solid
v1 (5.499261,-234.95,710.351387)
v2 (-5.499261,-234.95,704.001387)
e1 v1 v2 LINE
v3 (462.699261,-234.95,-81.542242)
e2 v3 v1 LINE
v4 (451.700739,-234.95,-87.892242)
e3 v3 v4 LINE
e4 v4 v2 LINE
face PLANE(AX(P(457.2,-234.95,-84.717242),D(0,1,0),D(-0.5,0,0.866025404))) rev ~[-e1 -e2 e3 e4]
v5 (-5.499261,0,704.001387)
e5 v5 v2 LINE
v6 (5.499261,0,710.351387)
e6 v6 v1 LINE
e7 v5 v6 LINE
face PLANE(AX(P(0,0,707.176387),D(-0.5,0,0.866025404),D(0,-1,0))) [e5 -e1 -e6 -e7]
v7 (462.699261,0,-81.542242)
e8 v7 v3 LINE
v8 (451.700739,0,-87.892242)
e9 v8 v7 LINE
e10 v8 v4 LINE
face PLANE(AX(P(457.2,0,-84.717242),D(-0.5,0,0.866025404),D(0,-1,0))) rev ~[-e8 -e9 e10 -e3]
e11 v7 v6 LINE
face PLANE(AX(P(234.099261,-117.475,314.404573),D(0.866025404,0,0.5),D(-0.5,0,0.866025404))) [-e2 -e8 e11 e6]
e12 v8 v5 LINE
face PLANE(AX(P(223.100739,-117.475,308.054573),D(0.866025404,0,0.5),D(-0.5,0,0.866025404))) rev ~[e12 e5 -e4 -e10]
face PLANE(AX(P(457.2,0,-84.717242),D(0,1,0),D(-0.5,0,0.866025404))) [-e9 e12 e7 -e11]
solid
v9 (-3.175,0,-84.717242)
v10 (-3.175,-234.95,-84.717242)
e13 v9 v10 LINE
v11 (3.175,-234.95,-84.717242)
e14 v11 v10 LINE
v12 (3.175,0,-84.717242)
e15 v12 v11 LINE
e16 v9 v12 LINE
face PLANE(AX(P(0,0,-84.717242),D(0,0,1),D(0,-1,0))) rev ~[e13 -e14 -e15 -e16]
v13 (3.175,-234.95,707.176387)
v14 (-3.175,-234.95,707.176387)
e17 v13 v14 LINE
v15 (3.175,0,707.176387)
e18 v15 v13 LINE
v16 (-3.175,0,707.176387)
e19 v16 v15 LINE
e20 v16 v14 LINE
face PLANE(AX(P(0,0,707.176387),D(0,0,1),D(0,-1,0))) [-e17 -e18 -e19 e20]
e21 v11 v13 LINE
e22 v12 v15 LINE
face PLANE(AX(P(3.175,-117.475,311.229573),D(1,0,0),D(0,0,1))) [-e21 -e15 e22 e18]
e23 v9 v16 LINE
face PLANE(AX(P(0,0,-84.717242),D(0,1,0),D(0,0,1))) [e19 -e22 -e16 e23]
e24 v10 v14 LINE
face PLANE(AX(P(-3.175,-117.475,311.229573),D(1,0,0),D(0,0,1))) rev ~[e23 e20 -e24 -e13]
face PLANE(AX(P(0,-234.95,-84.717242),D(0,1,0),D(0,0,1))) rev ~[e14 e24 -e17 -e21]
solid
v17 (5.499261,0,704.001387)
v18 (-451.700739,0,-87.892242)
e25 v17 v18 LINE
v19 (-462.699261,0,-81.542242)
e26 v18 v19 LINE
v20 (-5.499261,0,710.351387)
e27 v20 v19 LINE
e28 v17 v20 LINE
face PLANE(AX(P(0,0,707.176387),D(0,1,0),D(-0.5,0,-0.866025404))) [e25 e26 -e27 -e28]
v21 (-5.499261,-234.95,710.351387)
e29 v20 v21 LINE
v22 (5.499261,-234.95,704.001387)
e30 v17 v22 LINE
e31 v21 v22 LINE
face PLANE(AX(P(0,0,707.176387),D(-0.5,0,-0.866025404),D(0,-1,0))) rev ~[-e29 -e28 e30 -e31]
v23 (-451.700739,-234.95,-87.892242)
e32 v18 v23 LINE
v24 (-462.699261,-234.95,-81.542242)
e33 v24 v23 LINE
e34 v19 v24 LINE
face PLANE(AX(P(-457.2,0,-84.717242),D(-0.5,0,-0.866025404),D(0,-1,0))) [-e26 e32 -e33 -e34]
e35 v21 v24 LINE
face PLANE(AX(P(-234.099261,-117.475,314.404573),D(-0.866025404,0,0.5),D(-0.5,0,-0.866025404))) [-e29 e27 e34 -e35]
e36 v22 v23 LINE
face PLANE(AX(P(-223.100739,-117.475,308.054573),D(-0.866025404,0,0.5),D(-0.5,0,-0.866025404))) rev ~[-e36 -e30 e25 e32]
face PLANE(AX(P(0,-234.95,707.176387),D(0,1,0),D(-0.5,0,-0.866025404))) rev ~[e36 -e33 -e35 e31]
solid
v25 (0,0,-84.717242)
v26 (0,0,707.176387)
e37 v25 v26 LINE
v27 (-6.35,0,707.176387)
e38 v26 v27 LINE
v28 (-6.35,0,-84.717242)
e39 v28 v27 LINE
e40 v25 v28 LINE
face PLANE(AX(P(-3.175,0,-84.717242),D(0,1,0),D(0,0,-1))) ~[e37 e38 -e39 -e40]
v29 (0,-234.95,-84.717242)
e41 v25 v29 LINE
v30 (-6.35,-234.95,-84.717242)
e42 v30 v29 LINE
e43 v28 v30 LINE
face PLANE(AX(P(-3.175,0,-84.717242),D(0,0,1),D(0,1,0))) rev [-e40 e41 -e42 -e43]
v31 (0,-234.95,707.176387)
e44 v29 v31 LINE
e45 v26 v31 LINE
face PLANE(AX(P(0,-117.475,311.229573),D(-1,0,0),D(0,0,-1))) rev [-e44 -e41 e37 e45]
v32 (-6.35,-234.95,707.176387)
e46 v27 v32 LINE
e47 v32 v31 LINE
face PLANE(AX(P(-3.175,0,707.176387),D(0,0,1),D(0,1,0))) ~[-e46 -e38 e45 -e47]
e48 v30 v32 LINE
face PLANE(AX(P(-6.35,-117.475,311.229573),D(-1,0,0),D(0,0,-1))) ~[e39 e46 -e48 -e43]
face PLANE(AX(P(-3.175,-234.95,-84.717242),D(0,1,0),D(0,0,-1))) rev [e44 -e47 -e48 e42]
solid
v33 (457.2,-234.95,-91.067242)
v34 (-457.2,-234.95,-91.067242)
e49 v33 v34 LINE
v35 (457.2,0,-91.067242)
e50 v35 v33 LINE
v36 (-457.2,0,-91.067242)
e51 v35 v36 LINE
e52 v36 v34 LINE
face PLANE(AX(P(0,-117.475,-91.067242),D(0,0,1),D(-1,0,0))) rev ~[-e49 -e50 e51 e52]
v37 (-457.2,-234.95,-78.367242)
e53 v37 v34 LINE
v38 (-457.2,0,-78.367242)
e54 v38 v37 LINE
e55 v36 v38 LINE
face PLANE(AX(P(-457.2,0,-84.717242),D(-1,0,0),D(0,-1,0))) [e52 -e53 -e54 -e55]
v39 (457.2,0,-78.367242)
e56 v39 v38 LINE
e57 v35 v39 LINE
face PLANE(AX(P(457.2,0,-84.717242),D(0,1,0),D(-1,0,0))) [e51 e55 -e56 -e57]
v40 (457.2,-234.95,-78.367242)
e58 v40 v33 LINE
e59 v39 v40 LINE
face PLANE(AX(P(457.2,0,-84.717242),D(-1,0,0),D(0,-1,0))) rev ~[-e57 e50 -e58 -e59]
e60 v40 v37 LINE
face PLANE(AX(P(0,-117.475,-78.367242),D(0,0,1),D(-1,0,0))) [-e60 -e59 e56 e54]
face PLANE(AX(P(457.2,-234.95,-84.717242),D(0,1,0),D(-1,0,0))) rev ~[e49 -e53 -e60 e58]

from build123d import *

# Parameters (mm, degrees)
F2_E1_W  = 791.8936292205
F2_E1_H  = 234.95
F3_DEPTH = 3.175
F1_E0_W  = 914.4
F1_E0_H  = 234.95
F5_DEPTH = 6.35
F1_E3_W  = 914.4
F1_E3_H  = 234.95
F6_DEPTH = 6.35
F1_E2_W  = 914.4
F1_E2_H  = 234.95
F7_DEPTH = 6.35


# Not quite as in the source:
# - a feature of the source that left no trace in its solid (it failed there, or was rolled back) is left out
# - a pattern or mirror of a feature is missing from the dataset's text; its kind, count and spacing are read off the source's solid
# - the program builds the solid bodies; features that only make, move or delete a surface that nothing else refers to are left out


with BuildPart() as f3:
    # F2_E1 (on explicit) → F3 (new body, symmetric)
    with BuildSketch(Plane(origin=(0, 0, -84.7172419105), x_dir=(0, 0, 1), z_dir=(1, 0, 0))):
        with Locations((395.9468146102, 117.475)):
            Rectangle(F2_E1_W, F2_E1_H)
    extrude(amount=F3_DEPTH, both=True)


with BuildPart() as f3_copies_1:
    # F3_copies: instance of F3
    add(f3.part.mirror(Plane(origin=(-1.5875, 0, 0), x_dir=(0, 0, -1), z_dir=(-1, 0, 0))))


with BuildPart() as f5:
    # F1_E0 (on explicit) → F5 (new body, symmetric)
    with BuildSketch(Plane(origin=(457.2, 0, -84.7172419105), x_dir=(-1, 0, 0), z_dir=(0, 0, 1))):
        with Locations((457.2, 117.475)):
            Rectangle(F1_E0_W, F1_E0_H)
    extrude(amount=F5_DEPTH, both=True)


with BuildPart() as f6:
    # F1_E3 (on explicit) → F6 (new body, symmetric)
    with BuildSketch(Plane(origin=(457.2, 0, -84.7172419105), x_dir=(-0.5, 0, 0.8660254038), z_dir=(0.8660254038, 0, 0.5))):
        with Locations((457.2, 117.475)):
            Rectangle(F1_E3_W, F1_E3_H)
    extrude(amount=F6_DEPTH, both=True)


with BuildPart() as f7:
    # F1_E2 (on explicit) → F7 (new body, symmetric)
    with BuildSketch(Plane(origin=(0, 0, 707.17638731), x_dir=(-0.5, 0, -0.8660254038), z_dir=(-0.8660254038, 0, 0.5))):
        with Locations((457.2, 117.475)):
            Rectangle(F1_E2_W, F1_E2_H)
    extrude(amount=F7_DEPTH, both=True)


solid = Compound([f3.part, f3_copies_1.part, f5.part, f6.part, f7.part])
